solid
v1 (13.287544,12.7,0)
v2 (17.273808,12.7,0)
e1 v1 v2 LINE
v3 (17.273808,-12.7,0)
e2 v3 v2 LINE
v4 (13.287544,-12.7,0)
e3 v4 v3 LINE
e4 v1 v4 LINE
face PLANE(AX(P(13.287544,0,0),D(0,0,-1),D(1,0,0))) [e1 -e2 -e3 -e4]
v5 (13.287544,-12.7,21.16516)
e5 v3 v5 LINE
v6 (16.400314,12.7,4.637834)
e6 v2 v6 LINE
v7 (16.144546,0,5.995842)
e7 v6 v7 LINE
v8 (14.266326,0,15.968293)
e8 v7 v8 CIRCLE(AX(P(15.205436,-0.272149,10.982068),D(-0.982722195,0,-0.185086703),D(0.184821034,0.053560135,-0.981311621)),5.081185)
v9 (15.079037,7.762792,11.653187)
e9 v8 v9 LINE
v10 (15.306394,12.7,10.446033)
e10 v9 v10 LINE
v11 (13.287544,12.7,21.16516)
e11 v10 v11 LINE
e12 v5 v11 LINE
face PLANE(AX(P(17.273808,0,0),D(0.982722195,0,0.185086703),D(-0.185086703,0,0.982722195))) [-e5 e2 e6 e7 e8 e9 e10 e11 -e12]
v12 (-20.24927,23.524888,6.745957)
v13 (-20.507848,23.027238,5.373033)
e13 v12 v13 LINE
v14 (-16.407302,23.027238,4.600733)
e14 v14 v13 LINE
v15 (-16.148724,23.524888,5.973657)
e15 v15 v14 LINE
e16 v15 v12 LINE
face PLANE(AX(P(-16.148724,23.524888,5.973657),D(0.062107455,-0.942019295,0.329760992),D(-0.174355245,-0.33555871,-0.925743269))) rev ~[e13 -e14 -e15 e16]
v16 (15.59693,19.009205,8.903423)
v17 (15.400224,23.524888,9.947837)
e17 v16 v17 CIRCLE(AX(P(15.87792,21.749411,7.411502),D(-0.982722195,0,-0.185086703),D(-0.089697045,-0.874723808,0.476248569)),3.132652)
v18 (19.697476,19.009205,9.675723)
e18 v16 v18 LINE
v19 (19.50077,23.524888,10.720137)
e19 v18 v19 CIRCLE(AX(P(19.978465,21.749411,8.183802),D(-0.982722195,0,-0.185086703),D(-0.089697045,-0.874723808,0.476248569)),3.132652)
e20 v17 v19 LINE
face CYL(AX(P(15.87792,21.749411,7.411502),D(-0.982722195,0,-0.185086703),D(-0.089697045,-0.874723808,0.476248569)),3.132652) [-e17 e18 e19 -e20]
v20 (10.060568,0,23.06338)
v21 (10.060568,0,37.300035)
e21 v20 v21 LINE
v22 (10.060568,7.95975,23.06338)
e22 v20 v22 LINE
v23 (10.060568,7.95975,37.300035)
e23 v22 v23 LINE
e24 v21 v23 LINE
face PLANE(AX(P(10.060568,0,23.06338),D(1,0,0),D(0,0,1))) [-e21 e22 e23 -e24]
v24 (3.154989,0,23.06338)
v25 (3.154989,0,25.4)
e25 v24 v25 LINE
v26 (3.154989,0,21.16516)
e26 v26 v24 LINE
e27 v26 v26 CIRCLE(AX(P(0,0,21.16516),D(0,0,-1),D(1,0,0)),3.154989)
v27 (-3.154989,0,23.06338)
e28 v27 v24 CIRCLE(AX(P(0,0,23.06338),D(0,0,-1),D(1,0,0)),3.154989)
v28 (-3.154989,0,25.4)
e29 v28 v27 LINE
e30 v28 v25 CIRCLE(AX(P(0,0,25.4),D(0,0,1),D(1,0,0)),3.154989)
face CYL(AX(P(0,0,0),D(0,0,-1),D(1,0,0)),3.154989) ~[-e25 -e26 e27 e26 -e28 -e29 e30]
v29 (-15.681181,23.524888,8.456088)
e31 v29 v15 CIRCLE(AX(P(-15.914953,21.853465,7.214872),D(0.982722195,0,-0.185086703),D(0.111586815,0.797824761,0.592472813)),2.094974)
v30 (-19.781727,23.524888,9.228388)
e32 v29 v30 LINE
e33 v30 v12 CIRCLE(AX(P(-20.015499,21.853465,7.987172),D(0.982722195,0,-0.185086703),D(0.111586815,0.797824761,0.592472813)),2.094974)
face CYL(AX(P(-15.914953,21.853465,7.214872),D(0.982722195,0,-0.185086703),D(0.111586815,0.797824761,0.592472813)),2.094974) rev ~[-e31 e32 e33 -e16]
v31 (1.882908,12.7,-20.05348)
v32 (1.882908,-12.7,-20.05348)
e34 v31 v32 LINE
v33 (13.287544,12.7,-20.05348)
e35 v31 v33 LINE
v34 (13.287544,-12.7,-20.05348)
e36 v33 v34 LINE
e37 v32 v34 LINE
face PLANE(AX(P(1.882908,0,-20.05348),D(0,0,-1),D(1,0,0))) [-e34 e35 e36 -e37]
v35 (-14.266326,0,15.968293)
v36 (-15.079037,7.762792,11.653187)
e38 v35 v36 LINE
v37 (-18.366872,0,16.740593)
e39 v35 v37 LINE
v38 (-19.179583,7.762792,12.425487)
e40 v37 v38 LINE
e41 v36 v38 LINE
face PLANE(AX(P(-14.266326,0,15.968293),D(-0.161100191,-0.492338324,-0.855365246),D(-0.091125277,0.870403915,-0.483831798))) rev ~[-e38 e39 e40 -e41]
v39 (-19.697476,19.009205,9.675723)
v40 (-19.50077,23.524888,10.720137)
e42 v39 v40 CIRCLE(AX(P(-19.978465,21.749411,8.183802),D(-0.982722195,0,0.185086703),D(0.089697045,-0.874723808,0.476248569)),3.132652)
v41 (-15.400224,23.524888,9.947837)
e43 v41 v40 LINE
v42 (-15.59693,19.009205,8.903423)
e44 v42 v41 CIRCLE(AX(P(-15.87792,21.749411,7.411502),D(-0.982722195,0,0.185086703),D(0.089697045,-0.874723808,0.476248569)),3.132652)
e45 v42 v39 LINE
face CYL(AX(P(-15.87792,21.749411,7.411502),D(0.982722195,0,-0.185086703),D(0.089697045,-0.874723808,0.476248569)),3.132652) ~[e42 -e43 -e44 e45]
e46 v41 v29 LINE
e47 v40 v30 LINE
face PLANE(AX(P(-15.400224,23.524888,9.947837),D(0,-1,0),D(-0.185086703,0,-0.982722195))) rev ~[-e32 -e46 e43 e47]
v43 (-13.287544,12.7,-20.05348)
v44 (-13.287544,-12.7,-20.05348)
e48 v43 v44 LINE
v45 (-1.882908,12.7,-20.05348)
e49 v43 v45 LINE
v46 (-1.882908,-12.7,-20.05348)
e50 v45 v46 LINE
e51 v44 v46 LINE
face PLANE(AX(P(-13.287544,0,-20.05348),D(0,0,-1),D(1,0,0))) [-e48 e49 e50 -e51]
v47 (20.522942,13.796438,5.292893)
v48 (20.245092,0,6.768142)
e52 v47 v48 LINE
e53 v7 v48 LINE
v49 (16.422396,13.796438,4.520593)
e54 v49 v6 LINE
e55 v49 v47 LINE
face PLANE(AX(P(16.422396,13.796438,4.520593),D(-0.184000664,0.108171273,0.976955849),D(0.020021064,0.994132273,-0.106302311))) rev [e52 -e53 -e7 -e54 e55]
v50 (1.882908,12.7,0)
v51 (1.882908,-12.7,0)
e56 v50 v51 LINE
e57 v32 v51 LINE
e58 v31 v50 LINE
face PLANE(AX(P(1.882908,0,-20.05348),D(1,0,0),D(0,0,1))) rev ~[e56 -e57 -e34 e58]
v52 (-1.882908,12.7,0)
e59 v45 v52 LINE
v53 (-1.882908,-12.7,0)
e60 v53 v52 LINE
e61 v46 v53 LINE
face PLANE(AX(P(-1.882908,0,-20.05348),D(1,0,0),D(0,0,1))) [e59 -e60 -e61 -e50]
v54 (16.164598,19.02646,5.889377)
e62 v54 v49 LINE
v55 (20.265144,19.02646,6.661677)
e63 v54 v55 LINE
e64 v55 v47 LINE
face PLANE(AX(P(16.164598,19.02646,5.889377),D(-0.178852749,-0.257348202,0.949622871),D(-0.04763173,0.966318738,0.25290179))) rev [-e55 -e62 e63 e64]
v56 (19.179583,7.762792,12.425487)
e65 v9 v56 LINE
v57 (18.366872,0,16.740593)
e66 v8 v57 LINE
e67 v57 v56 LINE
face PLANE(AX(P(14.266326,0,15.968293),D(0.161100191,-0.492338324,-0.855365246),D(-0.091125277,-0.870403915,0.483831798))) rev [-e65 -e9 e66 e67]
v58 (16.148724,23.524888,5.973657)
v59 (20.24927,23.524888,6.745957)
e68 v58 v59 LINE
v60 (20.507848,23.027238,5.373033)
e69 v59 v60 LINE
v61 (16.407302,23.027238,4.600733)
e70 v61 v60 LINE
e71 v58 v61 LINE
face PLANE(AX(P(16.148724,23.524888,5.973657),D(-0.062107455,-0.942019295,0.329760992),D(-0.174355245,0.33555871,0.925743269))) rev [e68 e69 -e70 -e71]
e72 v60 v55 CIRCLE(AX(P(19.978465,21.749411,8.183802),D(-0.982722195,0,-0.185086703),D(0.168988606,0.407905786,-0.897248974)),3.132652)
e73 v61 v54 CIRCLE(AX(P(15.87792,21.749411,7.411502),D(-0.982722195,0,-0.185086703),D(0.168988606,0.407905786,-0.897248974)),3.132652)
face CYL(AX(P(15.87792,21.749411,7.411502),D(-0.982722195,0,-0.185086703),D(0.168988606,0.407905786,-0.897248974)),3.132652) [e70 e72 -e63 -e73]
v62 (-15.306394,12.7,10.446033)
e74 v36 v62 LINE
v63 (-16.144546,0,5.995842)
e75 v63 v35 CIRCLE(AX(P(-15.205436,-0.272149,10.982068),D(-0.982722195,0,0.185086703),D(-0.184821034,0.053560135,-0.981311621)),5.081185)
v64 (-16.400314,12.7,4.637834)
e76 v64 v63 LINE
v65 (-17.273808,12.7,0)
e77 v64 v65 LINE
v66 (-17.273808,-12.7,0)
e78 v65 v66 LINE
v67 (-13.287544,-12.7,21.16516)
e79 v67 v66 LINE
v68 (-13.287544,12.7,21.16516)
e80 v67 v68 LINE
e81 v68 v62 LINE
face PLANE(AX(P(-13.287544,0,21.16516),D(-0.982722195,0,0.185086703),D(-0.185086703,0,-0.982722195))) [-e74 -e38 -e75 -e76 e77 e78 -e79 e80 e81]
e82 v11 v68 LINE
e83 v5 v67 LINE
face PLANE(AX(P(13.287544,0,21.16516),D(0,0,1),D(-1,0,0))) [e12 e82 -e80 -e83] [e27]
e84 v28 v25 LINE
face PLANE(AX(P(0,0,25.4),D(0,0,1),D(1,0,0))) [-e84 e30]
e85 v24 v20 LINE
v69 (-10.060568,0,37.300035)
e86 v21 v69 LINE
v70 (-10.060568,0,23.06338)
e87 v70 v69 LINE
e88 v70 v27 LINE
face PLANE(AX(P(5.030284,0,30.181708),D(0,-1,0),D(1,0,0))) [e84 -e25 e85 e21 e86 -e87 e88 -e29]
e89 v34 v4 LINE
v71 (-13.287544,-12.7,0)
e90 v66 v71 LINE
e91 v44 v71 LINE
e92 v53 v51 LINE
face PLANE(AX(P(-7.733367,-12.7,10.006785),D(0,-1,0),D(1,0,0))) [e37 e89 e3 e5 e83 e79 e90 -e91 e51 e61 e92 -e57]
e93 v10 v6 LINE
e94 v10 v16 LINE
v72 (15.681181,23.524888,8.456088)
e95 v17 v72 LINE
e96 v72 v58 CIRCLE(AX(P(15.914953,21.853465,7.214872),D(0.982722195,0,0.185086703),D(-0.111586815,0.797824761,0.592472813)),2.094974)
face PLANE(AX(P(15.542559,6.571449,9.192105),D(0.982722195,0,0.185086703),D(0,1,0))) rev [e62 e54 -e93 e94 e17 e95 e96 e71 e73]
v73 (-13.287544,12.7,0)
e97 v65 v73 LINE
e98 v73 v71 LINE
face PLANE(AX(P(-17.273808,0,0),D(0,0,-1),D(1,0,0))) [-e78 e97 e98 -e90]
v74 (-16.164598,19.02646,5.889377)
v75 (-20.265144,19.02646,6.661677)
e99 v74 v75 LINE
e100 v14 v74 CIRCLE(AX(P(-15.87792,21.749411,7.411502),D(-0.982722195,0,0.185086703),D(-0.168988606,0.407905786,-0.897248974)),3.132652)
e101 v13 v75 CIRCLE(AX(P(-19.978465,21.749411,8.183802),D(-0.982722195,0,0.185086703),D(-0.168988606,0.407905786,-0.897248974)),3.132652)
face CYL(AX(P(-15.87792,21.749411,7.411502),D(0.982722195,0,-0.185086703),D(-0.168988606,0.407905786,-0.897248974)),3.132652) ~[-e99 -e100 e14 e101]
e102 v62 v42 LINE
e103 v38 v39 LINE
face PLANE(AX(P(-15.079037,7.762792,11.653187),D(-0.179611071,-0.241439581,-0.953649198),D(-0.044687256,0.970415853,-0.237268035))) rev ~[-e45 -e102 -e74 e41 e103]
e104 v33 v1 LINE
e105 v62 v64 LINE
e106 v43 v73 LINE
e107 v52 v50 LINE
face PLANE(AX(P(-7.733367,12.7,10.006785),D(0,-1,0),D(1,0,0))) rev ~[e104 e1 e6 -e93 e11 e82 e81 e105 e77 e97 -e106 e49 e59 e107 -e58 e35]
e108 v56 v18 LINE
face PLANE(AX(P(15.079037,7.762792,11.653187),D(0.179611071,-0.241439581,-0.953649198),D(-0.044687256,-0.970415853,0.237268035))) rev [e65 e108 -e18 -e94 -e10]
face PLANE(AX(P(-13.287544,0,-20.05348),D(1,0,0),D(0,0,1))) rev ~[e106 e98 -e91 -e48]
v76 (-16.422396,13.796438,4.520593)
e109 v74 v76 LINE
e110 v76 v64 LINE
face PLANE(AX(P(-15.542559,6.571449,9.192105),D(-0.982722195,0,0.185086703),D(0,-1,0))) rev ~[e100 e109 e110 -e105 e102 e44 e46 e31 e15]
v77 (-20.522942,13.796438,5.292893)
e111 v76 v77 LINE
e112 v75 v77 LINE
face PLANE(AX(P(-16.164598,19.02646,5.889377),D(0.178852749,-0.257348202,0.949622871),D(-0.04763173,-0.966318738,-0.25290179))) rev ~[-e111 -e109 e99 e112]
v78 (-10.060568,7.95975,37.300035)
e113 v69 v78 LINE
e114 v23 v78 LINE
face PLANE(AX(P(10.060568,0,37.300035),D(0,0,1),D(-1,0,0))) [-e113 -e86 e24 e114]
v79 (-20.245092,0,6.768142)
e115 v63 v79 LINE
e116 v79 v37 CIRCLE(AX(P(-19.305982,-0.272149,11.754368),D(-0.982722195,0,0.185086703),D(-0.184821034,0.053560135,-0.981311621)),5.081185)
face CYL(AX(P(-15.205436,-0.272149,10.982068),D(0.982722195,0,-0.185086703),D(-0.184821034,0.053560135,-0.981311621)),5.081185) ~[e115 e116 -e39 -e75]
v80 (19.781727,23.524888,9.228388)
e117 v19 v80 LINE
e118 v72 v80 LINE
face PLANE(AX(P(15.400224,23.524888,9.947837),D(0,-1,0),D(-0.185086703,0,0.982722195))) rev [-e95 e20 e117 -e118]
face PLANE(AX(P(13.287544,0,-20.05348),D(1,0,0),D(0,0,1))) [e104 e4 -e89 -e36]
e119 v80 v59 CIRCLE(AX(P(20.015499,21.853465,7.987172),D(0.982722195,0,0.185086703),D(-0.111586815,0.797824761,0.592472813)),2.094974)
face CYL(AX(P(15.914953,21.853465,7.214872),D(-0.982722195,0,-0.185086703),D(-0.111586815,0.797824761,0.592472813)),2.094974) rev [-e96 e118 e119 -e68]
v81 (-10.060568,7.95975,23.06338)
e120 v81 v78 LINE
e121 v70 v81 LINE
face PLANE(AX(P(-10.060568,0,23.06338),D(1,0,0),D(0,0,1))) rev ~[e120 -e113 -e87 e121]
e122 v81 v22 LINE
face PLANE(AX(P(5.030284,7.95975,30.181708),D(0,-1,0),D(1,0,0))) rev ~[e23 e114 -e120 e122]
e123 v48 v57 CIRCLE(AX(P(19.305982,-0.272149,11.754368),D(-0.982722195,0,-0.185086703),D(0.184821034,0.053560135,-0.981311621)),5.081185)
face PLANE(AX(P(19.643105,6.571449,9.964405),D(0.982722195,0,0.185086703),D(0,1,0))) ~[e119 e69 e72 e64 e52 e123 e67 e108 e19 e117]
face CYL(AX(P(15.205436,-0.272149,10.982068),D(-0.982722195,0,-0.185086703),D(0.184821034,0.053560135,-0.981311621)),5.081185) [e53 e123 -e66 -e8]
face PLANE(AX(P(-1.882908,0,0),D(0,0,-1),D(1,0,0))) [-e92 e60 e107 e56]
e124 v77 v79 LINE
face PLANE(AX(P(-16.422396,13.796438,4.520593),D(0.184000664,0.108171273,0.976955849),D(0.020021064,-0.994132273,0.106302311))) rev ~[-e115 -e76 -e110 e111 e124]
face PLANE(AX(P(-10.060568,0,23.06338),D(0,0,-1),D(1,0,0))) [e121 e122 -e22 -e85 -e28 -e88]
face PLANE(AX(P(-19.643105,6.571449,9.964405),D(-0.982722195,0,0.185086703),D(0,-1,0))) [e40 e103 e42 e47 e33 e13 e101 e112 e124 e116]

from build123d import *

# Parameters (mm, degrees)
F0_W     = 11.4046361996
F0_H     = 20.0534798205
F1_DEPTH = 12.7
F3_DEPTH = 4.17264
F5_R     = 3.1549889686
F6_DEPTH = 25.4
F7_W     = 10.0605683401
F7_H     = 14.2366550863
F8_DEPTH = 7.95975


with BuildPart() as f1:
    # F0 (on Front) → F1 (new body, symmetric)
    with BuildSketch(Plane.XZ):
        Polygon((-13.2875442505, 21.1651604623), (-17.2738078982, 0), (-13.2875442505, 0), (-1.8829080509, 0), (0, 0), (0, 21.1651604623), align=None)
        with Locations((-7.5852261507, -10.0267399102)):
            Rectangle(F0_W, F0_H)
        Polygon((13.2875442505, 21.1651604623), (0, 21.1651604623), (0, 0), (1.8829080509, 0), (13.2875442505, 0), (17.2738078982, 0), align=None)
        with Locations((7.5852261507, -10.0267399102)):
            Rectangle(F0_W, F0_H)
    extrude(amount=F1_DEPTH, both=True)

    # F2 (on face) → F3 (join)
    with BuildSketch(Plane(origin=(-16.6820575494, 0, 3.1419123751), x_dir=(0, -1, 0), z_dir=(-0.982722195, 0, 0.1850867027))):
        with BuildLine():
            Line((-13.796438463, 1.4029195299), (0, 2.9041063972))
            ThreePointArc((0, 2.9041063972), (5.3533335924, 7.9779976513), (0, 13.0518889055))
            Line((0, 13.0518889055), (-7.7627915889, 8.660916239))
            Line((-7.7627915889, 8.660916239), (-19.0092052332, 5.8628071696))
            ThreePointArc((-19.0092052332, 5.8628071696), (-18.616808085, 4.3270320221), (-19.026460126, 2.7957691345))
            Line((-19.026460126, 2.7957691345), (-13.796438463, 1.4029195299))
        make_face()
        with BuildLine():
            ThreePointArc((-23.0272375047, 1.4844691614), (-20.7737198496, 1.3678224494), (-19.026460126, 2.7957691345))
            ThreePointArc((-19.026460126, 2.7957691345), (-18.616808085, 4.3270320221), (-19.0092052332, 5.8628071696))
            ThreePointArc((-19.0092052332, 5.8628071696), (-21.0317417116, 7.3939934823), (-23.5248878598, 6.9255838171))
            Line((-23.5248878598, 6.9255838171), (-23.5248878598, 5.4076067172))
            ThreePointArc((-23.5248878598, 5.4076067172), (-19.7584909862, 4.1445688112), (-23.5248878598, 2.8815309051))
            Line((-23.5248878598, 2.8815309051), (-23.0272375047, 1.4844691614))
        make_face()
    extrude(amount=F3_DEPTH)

    # F4: F1 across plane


with BuildPart() as f1_1:
    add(f1.part)
    add(f1.part.mirror(Plane.YZ))

    # F5 (on Top) → F6 (join)
    with BuildSketch(Plane.XY):
        Circle(F5_R)
    extrude(amount=F6_DEPTH)

    # F7 (on Front) → F8 (join)
    with BuildSketch(Plane.XZ):
        with Locations((5.0302841701, 30.1817078143)):
            Rectangle(F7_W, F7_H)
        with Locations((-5.0302841701, 30.1817078143)):
            Rectangle(F7_W, F7_H)
    extrude(amount=-F8_DEPTH)


solid = f1_1.part
